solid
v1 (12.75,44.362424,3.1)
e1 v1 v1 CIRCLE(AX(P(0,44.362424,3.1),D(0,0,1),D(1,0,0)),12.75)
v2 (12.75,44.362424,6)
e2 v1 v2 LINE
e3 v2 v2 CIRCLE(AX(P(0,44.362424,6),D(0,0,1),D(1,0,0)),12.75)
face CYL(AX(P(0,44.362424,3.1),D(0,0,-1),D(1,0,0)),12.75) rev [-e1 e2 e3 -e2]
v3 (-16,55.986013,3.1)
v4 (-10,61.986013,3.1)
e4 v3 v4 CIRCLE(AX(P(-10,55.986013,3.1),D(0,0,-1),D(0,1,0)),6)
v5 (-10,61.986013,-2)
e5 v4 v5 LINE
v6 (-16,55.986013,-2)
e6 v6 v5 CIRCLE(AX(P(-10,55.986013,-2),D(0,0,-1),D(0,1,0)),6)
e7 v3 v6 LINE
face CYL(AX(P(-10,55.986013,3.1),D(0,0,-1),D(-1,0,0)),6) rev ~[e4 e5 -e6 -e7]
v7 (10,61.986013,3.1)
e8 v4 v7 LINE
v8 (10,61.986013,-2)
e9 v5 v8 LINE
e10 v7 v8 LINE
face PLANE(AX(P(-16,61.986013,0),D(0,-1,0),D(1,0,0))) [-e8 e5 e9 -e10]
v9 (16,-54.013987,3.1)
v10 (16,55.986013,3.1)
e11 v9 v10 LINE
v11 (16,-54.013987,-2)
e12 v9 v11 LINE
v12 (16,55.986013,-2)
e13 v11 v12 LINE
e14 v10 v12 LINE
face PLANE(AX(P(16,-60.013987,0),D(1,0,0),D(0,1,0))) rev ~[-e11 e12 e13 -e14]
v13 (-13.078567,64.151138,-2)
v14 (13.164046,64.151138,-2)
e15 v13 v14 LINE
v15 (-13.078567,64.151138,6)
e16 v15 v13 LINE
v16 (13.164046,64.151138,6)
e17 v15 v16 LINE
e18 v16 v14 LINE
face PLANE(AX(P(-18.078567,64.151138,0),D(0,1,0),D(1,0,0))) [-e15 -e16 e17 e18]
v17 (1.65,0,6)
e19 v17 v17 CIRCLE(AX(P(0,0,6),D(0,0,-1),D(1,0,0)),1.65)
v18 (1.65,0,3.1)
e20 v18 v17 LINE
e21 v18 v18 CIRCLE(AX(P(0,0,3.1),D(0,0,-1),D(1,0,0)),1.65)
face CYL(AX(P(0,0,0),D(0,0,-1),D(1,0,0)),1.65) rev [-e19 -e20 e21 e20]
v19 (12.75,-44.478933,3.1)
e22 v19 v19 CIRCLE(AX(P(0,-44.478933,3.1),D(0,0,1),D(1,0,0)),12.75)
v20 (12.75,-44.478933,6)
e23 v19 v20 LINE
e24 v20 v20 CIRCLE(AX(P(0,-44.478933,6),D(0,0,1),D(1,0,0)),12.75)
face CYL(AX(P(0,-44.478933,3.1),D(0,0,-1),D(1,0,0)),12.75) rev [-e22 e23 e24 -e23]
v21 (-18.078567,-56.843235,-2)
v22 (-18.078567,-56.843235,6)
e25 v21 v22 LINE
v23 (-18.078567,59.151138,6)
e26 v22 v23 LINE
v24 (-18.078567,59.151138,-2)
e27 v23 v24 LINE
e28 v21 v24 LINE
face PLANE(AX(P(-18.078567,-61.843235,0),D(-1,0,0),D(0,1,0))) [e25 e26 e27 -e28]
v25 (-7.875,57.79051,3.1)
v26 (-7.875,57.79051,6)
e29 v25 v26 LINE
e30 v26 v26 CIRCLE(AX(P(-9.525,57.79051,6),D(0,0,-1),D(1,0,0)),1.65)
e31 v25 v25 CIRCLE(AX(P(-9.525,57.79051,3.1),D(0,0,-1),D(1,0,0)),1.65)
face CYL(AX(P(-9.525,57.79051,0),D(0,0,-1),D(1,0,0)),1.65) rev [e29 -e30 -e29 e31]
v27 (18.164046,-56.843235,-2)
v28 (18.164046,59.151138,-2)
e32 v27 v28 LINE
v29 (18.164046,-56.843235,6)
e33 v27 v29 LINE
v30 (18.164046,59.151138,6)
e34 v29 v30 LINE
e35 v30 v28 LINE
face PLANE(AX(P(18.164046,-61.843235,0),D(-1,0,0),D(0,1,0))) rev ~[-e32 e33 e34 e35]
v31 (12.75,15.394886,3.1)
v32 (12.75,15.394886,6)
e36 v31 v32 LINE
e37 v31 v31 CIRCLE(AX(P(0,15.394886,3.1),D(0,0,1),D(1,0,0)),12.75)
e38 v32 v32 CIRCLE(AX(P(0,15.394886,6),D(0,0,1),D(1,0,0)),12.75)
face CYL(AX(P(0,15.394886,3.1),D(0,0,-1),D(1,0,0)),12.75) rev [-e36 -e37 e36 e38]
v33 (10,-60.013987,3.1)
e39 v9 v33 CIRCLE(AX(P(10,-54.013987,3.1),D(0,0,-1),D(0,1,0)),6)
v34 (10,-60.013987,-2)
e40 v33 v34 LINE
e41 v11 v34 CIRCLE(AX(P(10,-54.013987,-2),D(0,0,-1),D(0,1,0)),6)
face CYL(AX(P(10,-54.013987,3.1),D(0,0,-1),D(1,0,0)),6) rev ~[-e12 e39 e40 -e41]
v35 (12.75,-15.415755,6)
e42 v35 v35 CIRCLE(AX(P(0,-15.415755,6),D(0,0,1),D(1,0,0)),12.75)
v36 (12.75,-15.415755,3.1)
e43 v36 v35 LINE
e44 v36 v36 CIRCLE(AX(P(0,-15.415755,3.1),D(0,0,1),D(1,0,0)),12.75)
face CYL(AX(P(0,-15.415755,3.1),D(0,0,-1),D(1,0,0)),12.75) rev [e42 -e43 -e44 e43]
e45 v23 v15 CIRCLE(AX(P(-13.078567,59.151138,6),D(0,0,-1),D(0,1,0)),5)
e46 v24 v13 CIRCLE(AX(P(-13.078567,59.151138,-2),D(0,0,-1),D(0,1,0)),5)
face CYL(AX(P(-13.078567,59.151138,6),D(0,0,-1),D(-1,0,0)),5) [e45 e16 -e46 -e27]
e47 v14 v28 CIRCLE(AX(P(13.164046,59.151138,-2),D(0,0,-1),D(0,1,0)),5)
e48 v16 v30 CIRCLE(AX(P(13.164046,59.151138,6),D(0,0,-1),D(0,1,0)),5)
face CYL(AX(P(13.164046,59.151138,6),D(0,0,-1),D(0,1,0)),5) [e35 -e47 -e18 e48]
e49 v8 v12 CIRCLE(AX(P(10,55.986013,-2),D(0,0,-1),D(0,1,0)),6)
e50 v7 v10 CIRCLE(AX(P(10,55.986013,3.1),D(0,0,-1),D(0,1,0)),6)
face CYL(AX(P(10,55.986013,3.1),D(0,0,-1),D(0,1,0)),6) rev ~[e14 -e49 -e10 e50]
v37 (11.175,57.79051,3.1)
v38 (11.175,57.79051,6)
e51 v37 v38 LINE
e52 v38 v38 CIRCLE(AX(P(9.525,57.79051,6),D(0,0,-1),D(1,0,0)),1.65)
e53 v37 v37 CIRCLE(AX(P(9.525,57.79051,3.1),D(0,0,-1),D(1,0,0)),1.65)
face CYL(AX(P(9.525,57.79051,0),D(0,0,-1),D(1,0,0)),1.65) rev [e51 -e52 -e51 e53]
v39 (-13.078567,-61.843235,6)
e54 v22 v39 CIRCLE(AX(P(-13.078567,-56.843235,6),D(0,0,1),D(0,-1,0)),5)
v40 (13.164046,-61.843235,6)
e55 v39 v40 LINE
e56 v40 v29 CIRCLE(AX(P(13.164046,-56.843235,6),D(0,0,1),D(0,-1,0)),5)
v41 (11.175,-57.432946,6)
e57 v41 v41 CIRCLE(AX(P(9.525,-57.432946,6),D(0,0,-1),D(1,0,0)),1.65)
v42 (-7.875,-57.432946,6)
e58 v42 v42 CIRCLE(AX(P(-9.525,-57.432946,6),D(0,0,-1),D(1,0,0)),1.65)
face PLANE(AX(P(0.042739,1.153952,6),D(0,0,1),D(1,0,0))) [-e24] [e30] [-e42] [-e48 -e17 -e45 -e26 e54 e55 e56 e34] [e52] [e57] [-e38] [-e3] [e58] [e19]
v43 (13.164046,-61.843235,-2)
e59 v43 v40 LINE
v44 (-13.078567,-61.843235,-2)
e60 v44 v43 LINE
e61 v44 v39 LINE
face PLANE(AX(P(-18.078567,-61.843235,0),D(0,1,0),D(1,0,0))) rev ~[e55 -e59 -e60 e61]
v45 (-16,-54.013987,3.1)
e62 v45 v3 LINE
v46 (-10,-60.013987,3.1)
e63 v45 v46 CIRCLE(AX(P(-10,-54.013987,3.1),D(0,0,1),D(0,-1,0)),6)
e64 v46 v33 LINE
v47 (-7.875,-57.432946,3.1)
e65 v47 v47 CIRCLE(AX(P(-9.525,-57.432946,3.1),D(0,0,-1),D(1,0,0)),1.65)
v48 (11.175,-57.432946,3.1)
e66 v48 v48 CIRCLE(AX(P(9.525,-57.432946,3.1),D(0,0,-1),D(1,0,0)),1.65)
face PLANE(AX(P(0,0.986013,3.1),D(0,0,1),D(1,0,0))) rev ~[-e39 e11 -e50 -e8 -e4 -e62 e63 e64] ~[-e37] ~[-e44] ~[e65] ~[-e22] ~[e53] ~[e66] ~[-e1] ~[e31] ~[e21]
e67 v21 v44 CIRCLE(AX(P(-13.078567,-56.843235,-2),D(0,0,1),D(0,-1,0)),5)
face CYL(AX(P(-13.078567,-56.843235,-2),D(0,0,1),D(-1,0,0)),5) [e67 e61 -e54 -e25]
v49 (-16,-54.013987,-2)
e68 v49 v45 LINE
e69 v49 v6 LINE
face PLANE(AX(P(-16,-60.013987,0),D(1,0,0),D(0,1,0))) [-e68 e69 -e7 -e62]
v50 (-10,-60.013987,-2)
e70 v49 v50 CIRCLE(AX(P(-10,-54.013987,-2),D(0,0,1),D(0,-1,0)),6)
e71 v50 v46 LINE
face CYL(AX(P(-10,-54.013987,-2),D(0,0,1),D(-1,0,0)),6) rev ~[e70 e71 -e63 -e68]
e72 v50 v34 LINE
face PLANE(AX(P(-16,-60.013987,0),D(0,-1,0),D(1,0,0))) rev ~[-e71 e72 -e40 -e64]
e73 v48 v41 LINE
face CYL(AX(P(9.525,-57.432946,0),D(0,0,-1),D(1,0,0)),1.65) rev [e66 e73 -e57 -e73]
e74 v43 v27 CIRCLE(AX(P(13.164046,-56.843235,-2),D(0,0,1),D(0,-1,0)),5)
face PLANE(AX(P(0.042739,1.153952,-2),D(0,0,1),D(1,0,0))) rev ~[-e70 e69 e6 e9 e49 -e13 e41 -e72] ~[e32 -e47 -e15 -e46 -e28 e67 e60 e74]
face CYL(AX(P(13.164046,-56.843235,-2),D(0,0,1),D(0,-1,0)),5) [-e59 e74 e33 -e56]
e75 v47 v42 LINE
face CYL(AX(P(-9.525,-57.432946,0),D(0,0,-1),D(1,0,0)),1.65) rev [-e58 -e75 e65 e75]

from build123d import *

# Parameters (mm, degrees)
F1_START      = 3.1
F0_W          = 32
F0_H          = 122
F0_R          = 1.65
F0_R_2        = 1.25
F0_R_3        = 12.75
F1_DEPTH      = 2.9
F2_START      = 3
F0_R_4        = 2
F0_R_5        = 1
F2_DEPTH      = 2
F3_DEPTH      = 25
F3_DEPTH_BACK = 39.8
F0_W_2        = 36.2426135689
F0_H_2        = 125.9943731129
F4_DEPTH      = 2
F4_DEPTH_BACK = 6
F5_R          = 6
F6_R          = 5


# Not quite as in the source:
# - a feature names something its author has since deleted; it is built from what else it names


with BuildPart() as f1:
    # F0 (on Top) → F1 (new body)
    with BuildSketch(Plane.XY.offset(F1_START)):
        with Locations((0, 0.9860133167)):
            Rectangle(F0_W, F0_H)
        with Locations((-9.525, -57.4329458177)):
            Circle(F0_R, mode=Mode.SUBTRACT)
        with Locations((-9.525, -30.4671674967)):
            Circle(F0_R_2, mode=Mode.SUBTRACT)
        with Locations((0, -44.4789328166)):
            Circle(F0_R_3, mode=Mode.SUBTRACT)
        with Locations((-9.525, 0)):
            Circle(F0_R_2, mode=Mode.SUBTRACT)
        with Locations((0, -15.4157546586)):
            Circle(F0_R_3, mode=Mode.SUBTRACT)
        Circle(F0_R, mode=Mode.SUBTRACT)
        with Locations((9.525, -57.4329458177)):
            Circle(F0_R, mode=Mode.SUBTRACT)
        with Locations((9.525, -30.4671674967)):
            Circle(F0_R_2, mode=Mode.SUBTRACT)
        with Locations((9.525, 0)):
            Circle(F0_R_2, mode=Mode.SUBTRACT)
        with Locations((-9.525, 29.1974432766)):
            Circle(F0_R_2, mode=Mode.SUBTRACT)
        with Locations((0, 15.3948861798)):
            Circle(F0_R_3, mode=Mode.SUBTRACT)
        with Locations((-9.525, 57.7905103564)):
            Circle(F0_R, mode=Mode.SUBTRACT)
        with Locations((0, 44.3624239764)):
            Circle(F0_R_3, mode=Mode.SUBTRACT)
        with Locations((9.525, 29.1974432766)):
            Circle(F0_R_2, mode=Mode.SUBTRACT)
        with Locations((9.525, 57.7905103564)):
            Circle(F0_R, mode=Mode.SUBTRACT)
        with Locations((9.525, 0)):
            Circle(F0_R_2)
        with Locations((-9.525, 0)):
            Circle(F0_R_2)
        with Locations((9.525, 29.1974432766)):
            Circle(F0_R_2)
        with Locations((-9.525, 29.1974432766)):
            Circle(F0_R_2)
        with Locations((9.525, -30.4671674967)):
            Circle(F0_R_2)
        with Locations((-9.525, -30.4671674967)):
            Circle(F0_R_2)
        with Locations((9.525, -57.4329458177)):
            Circle(F0_R)
        with Locations((-9.525, -57.4329458177)):
            Circle(F0_R)
        Circle(F0_R)
        with Locations((9.525, 57.7905103564)):
            Circle(F0_R)
        with Locations((-9.525, 57.7905103564)):
            Circle(F0_R)
    extrude(amount=F1_DEPTH)

    # F0 (on Top) → F2 (cut)
    with BuildSketch(Plane.XY.offset(F2_START)):
        with Locations((0, 44.3624239764)):
            Circle(F0_R_3)
        with Locations((-9.525, 44.3624239764)):
            Circle(F0_R_4, mode=Mode.SUBTRACT)
        with Locations((9.525, 44.3624239764)):
            Circle(F0_R_4, mode=Mode.SUBTRACT)
        with Locations((0, 15.3948861798)):
            Circle(F0_R_3)
        with Locations((-9.525, 15.3948861798)):
            Circle(F0_R_4, mode=Mode.SUBTRACT)
        with Locations((9.525, 15.3948861798)):
            Circle(F0_R_4, mode=Mode.SUBTRACT)
        with Locations((0, -15.4157546586)):
            Circle(F0_R_3)
        with Locations((-9.525, -15.4157546586)):
            Circle(F0_R_4, mode=Mode.SUBTRACT)
        with Locations((9.525, -15.4157546586)):
            Circle(F0_R_4, mode=Mode.SUBTRACT)
        with Locations((0, -44.4789328166)):
            Circle(F0_R_3)
        with Locations((-9.525, -44.4789328166)):
            Circle(F0_R_4, mode=Mode.SUBTRACT)
        with Locations((9.525, -44.4789328166)):
            Circle(F0_R_4, mode=Mode.SUBTRACT)
        with Locations((9.525, 44.3624239764)):
            Circle(F0_R_4)
        with Locations((9.525, 44.3624239764)):
            Circle(F0_R_5, mode=Mode.SUBTRACT)
        with Locations((-9.525, 44.3624239764)):
            Circle(F0_R_4)
        with Locations((-9.525, 44.3624239764)):
            Circle(F0_R_5, mode=Mode.SUBTRACT)
        with Locations((9.525, 15.3948861798)):
            Circle(F0_R_4)
        with Locations((9.525, 15.3948861798)):
            Circle(F0_R_5, mode=Mode.SUBTRACT)
        with Locations((-9.525, 15.3948861798)):
            Circle(F0_R_4)
        with Locations((-9.525, 15.3948861798)):
            Circle(F0_R_5, mode=Mode.SUBTRACT)
        with Locations((9.525, -15.4157546586)):
            Circle(F0_R_4)
        with Locations((9.525, -15.4157546586)):
            Circle(F0_R_5, mode=Mode.SUBTRACT)
        with Locations((-9.525, -15.4157546586)):
            Circle(F0_R_4)
        with Locations((-9.525, -15.4157546586)):
            Circle(F0_R_5, mode=Mode.SUBTRACT)
        with Locations((9.525, -44.4789328166)):
            Circle(F0_R_4)
        with Locations((9.525, -44.4789328166)):
            Circle(F0_R_5, mode=Mode.SUBTRACT)
        with Locations((-9.525, -44.4789328166)):
            Circle(F0_R_4)
        with Locations((-9.525, -44.4789328166)):
            Circle(F0_R_5, mode=Mode.SUBTRACT)
        with Locations((9.525, 44.3624239764)):
            Circle(F0_R_5)
        with Locations((-9.525, 44.3624239764)):
            Circle(F0_R_5)
        with Locations((9.525, 15.3948861798)):
            Circle(F0_R_5)
        with Locations((-9.525, 15.3948861798)):
            Circle(F0_R_5)
        with Locations((9.525, -15.4157546586)):
            Circle(F0_R_5)
        with Locations((-9.525, -15.4157546586)):
            Circle(F0_R_5)
        with Locations((9.525, -44.4789328166)):
            Circle(F0_R_5)
        with Locations((-9.525, -44.4789328166)):
            Circle(F0_R_5)
    extrude(amount=F2_DEPTH, mode=Mode.SUBTRACT)

    # F0 (on Top) → F3 (cut, two sides)
    with BuildSketch(Plane.XY) as f3_sk:
        with Locations((9.525, -57.4329458177)):
            Circle(F0_R)
        Circle(F0_R)
        with Locations((-9.525, -57.4329458177)):
            Circle(F0_R)
        with Locations((-9.525, 57.7905103564)):
            Circle(F0_R)
        with Locations((9.525, 57.7905103564)):
            Circle(F0_R)
    extrude(amount=-F3_DEPTH, mode=Mode.SUBTRACT)
    extrude(f3_sk.sketch, amount=F3_DEPTH_BACK, mode=Mode.SUBTRACT)

    # F0 (on Top) → F4 (join, two sides)
    with BuildSketch(Plane.XY) as f4_sk:
        with Locations((0.0427393243, 1.1539515108)):
            Rectangle(F0_W_2, F0_H_2)
        with Locations((0, 0.9860133167)):
            Rectangle(F0_W, F0_H, mode=Mode.SUBTRACT)
    extrude(amount=-F4_DEPTH)
    extrude(f4_sk.sketch, amount=F4_DEPTH_BACK)

    # F5
    f5_edges = [f1.edges().sort_by_distance(p)[0] for p in [
        (-16, -60.013987, 0.55),
        (16, -60.013987, 0.55),
        (-16, 61.986013, 0.55),
        (16, 61.986013, 0.55),
    ]]
    fillet(f5_edges, radius=F5_R)

    # F6
    f6_edges = [f1.edges().sort_by_distance(p)[0] for p in [
        (18.164046, 64.151138, 2),
        (-18.078567, 64.151138, 2),
        (-18.078567, -61.843235, 2),
        (18.164046, -61.843235, 2),
    ]]
    fillet(f6_edges, radius=F6_R)


solid = f1.part
